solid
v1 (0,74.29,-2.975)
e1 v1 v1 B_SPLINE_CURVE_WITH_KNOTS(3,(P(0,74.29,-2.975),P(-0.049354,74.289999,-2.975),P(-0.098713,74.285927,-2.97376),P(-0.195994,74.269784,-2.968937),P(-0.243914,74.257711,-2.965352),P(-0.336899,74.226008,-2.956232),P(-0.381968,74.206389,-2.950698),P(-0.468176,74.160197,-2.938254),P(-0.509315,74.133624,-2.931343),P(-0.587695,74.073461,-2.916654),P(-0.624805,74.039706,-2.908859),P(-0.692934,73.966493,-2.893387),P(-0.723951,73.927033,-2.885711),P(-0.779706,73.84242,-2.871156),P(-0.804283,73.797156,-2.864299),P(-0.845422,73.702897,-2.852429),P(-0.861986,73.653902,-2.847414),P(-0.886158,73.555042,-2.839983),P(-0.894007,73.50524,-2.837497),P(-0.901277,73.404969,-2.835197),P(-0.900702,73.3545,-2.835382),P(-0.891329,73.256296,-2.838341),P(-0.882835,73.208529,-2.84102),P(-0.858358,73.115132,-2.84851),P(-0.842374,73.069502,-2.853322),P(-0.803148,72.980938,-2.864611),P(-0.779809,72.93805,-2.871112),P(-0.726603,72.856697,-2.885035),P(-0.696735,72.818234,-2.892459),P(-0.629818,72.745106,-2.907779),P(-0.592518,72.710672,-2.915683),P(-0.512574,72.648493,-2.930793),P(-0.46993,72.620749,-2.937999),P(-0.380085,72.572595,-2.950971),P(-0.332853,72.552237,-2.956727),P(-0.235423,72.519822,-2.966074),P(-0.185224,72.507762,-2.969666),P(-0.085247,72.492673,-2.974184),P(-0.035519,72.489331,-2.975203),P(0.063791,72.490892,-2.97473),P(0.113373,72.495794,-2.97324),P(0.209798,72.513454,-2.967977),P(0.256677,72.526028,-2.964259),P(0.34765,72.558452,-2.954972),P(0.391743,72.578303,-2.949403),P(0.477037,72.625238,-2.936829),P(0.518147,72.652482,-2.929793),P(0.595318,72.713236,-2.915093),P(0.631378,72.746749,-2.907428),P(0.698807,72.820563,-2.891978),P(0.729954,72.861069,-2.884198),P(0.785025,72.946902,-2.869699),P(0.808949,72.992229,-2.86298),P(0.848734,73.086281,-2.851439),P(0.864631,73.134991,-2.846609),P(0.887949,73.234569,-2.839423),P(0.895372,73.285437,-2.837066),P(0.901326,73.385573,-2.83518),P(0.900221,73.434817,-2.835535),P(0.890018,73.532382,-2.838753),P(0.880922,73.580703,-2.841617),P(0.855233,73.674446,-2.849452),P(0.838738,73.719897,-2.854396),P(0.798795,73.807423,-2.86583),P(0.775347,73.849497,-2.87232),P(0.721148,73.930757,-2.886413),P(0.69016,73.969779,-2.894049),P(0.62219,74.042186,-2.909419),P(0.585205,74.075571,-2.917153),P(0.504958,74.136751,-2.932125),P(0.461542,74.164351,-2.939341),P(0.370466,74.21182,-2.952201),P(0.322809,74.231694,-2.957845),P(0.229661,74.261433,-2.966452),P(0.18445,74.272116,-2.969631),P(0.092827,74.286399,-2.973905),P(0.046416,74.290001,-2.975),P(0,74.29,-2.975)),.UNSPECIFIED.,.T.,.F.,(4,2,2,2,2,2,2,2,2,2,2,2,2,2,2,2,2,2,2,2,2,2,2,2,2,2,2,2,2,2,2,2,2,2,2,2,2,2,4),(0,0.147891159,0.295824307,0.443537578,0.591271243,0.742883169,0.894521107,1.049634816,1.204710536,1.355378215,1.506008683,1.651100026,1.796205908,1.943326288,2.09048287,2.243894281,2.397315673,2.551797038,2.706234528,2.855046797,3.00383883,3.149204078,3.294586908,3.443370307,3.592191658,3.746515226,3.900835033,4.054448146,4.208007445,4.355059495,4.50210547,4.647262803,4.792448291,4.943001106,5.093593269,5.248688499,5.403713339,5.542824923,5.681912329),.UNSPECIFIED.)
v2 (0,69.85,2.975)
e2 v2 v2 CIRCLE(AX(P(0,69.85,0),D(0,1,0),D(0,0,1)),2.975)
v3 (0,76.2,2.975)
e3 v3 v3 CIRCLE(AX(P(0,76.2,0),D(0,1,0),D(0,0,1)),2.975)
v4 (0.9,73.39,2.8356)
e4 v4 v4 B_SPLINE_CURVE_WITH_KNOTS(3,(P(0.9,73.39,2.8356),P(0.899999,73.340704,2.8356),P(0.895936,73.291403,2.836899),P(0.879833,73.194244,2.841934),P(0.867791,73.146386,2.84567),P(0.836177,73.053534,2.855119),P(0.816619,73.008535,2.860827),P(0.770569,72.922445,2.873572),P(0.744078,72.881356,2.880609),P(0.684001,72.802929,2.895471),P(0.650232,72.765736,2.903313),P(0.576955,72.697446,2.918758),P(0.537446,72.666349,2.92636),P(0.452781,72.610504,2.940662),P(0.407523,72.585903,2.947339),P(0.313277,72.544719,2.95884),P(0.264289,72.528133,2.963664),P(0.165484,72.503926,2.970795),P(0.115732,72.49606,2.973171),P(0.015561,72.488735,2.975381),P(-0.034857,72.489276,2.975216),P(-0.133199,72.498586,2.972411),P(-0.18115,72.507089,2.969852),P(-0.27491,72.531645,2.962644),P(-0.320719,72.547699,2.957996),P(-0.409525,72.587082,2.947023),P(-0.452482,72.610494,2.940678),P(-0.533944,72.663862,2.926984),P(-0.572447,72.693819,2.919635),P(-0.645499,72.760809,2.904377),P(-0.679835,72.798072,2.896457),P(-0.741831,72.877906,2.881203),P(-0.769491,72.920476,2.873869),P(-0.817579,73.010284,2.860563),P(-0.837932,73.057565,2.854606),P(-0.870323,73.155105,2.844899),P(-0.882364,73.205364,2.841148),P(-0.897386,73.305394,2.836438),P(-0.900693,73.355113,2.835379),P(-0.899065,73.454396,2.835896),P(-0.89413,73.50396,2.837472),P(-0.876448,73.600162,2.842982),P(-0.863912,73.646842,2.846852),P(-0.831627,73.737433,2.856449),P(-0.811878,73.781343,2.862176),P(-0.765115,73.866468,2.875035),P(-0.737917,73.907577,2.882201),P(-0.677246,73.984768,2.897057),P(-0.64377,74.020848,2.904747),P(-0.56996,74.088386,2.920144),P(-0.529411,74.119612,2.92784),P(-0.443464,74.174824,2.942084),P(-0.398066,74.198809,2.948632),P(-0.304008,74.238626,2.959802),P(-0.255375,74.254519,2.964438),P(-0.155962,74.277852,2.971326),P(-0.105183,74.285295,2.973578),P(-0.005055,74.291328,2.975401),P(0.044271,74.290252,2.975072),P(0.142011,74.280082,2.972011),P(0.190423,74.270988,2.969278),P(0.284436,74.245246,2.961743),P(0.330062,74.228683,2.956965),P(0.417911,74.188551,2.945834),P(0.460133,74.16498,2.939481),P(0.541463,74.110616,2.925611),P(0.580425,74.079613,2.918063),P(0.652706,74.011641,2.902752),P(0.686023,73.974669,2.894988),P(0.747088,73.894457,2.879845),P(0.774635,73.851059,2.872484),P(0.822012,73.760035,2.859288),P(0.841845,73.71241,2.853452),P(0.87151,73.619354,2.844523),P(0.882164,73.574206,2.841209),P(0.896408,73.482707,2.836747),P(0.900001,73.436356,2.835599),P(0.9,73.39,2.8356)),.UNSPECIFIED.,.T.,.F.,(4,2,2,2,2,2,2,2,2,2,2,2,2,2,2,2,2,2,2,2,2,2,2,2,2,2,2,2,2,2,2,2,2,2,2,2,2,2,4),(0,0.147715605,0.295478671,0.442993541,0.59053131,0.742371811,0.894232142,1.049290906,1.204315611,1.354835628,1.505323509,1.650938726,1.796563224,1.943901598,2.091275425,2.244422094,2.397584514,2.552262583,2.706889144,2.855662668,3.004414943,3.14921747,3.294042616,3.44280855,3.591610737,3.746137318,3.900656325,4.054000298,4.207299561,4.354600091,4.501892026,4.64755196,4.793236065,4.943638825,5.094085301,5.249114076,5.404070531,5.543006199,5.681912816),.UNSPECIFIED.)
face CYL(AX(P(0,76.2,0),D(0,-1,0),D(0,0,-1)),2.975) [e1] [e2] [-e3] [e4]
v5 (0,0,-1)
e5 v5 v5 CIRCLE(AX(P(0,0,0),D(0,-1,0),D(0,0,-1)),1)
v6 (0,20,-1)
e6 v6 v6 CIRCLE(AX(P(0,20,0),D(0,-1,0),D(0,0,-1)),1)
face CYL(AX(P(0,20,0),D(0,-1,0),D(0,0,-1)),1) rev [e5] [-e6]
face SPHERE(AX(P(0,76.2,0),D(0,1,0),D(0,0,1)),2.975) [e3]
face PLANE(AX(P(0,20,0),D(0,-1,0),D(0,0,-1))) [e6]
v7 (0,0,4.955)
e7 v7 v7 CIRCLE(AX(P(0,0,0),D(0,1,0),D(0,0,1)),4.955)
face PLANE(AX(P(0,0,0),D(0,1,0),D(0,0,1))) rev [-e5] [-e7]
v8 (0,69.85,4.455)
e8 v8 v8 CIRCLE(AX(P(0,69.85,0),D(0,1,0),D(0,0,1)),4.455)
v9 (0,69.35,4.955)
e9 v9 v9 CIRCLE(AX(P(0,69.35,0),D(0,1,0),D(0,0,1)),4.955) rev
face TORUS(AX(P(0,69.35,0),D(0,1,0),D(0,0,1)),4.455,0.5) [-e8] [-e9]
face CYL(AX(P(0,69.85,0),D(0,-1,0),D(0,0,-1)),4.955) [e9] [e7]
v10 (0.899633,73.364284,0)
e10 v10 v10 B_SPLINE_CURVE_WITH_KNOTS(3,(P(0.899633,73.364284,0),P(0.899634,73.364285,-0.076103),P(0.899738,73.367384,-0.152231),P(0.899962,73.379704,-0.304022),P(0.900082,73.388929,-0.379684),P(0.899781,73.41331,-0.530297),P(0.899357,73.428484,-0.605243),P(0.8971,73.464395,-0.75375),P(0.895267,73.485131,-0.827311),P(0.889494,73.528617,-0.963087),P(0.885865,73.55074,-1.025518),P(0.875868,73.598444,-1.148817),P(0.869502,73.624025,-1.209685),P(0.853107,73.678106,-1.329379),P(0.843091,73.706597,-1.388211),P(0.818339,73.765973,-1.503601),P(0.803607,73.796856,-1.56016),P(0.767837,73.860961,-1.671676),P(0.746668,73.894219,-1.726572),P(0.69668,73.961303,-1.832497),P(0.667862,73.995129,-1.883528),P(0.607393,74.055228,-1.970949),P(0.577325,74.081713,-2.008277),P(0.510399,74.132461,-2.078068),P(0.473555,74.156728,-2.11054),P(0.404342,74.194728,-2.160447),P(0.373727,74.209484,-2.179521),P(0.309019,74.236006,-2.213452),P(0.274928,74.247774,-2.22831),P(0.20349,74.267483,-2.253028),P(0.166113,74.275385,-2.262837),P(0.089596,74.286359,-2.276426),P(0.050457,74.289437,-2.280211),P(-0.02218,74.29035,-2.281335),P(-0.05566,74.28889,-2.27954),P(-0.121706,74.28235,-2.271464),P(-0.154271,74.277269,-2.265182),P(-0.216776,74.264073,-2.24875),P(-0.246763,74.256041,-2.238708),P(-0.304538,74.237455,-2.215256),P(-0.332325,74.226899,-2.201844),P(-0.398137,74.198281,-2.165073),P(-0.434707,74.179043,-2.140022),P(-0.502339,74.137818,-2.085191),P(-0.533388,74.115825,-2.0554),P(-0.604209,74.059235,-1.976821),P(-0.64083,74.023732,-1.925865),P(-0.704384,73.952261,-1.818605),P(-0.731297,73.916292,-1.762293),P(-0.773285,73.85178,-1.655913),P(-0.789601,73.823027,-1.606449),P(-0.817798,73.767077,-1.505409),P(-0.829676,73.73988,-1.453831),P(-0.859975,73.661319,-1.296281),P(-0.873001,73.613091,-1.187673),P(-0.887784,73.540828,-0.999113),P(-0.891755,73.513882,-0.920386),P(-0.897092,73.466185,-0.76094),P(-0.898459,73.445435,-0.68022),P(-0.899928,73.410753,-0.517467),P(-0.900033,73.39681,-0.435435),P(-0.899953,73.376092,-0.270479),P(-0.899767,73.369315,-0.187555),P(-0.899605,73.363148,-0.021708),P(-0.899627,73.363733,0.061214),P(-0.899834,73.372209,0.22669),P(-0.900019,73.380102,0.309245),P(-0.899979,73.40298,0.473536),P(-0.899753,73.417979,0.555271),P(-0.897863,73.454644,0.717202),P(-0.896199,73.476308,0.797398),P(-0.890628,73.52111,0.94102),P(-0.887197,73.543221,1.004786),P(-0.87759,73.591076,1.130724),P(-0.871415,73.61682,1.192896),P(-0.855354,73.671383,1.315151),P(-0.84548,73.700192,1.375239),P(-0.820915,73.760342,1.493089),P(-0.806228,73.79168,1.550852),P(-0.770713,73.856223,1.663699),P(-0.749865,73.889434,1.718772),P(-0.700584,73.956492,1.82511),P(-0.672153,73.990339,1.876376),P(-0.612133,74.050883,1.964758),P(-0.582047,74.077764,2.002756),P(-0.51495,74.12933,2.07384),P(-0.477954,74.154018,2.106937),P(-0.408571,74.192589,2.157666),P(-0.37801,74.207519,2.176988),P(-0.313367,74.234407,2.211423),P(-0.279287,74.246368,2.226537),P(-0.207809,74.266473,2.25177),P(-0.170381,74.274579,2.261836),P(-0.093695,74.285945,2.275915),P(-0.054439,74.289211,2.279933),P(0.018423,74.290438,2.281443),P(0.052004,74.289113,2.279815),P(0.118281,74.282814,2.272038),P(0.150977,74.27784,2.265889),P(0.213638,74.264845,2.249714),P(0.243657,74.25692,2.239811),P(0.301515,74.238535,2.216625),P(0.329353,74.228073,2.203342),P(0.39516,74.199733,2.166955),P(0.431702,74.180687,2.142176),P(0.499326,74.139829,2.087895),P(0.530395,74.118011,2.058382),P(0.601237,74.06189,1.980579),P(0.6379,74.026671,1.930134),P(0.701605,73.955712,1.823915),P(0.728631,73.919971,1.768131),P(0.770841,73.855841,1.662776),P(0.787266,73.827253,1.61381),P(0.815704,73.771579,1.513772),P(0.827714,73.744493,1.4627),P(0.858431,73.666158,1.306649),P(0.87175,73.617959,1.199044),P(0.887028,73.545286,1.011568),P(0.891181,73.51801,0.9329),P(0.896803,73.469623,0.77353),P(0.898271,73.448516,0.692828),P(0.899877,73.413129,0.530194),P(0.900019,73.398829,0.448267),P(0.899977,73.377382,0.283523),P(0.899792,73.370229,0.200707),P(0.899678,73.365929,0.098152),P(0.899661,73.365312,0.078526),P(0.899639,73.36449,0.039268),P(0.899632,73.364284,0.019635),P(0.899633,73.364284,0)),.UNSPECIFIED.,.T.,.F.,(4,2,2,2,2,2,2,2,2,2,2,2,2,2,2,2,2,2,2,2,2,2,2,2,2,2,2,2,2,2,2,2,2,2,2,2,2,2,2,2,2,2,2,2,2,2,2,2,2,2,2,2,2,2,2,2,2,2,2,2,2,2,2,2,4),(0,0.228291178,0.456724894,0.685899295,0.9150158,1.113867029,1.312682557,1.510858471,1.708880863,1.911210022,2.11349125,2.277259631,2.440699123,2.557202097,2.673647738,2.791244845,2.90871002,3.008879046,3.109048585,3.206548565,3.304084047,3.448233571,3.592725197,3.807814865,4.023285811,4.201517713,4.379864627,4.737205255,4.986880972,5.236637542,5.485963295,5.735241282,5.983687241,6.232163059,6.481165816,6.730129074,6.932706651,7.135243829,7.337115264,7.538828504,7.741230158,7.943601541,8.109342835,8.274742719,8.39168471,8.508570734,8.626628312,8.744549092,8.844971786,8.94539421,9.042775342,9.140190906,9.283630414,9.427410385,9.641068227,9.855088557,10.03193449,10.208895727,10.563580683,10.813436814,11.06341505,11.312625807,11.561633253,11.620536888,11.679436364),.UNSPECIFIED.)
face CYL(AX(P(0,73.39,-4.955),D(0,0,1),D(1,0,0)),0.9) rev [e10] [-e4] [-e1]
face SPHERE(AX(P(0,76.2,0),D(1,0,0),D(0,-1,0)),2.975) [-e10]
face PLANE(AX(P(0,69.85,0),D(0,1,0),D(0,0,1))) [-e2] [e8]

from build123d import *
from build123d.topology import SkipClean

# Parameters (mm, degrees)
SKETCH2_R                 = 4.955
BOTTOM_OF_MOUNT_DEPTH     = 69.85
SKETCH3_R                 = 2.975
TOP_OF_MOUNT_DEPTH        = 6.35
SKETCH4_R                 = 1
SCREW_CUT_IN_BOTTOM_DEPTH = 20
LOCK_IN_HOLE_DEPTH        = 77.52152671
LOCK_IN_HOLE_DEPTH_BACK   = 77.52152671
SKETCH6_R                 = 0.9
FILLET5_R                 = 0.5


with BuildPart() as part:
    # Sketch2 → Bottom of Mount (new body)
    with BuildSketch(Plane(origin=(0, 0, 0), x_dir=(1, 0, 0), z_dir=(0, 1, 0))):
        with Locations(Location((0, 0, 0), (0, 0, 270))):
            Circle(SKETCH2_R)
    extrude(amount=BOTTOM_OF_MOUNT_DEPTH)

    # Sketch3 → Top of Mount (add)
    with BuildSketch(Plane(origin=(0, 69.85, 0), x_dir=(1, 0, 0), z_dir=(0, 1, 0))):
        with Locations(Location((0, 0, 0), (0, 0, 270))):
            Circle(SKETCH3_R)
    extrude(amount=TOP_OF_MOUNT_DEPTH)

    # Sketch4 → Screw Cut in Bottom (cut)
    with BuildSketch(Plane.XZ):
        with Locations(Location((0, 0, 0), (0, 0, 270))):
            Circle(SKETCH4_R)
    extrude(amount=-SCREW_CUT_IN_BOTTOM_DEPTH, mode=Mode.SUBTRACT)

    # Sketch6 → Lock in hole (cut, two sides: drawn at the far end of the back side and taken through both)
    with BuildSketch(Plane.XY.offset(-LOCK_IN_HOLE_DEPTH_BACK)):
        with Locations(Location((0, 73.39, 0), (0, 0, 89.999999984))):
            Circle(SKETCH6_R)
    extrude(amount=LOCK_IN_HOLE_DEPTH + LOCK_IN_HOLE_DEPTH_BACK, mode=Mode.SUBTRACT)

    # Sketch9 → Circular Top (revolve)
    with SkipClean():  # the faces are left unmerged after this step: merging them gives an invalid solid
        with BuildSketch(Plane.XY):
            with BuildLine():
                Line((2.975, 76.2), (-2.975, 76.2))
                ThreePointArc((-2.975, 76.2), (0, 79.175), (2.975, 76.2))
            make_face()
        revolve(axis=Axis((2.975, 76.2, 0), (-1, 0, 0)))

    # Fillet5
    fillet5_edges = [part.edges().sort_by_distance(p)[0] for p in [
        (0, 69.85, -4.955),
    ]]
    fillet(fillet5_edges, radius=FILLET5_R)


solid = part.part
